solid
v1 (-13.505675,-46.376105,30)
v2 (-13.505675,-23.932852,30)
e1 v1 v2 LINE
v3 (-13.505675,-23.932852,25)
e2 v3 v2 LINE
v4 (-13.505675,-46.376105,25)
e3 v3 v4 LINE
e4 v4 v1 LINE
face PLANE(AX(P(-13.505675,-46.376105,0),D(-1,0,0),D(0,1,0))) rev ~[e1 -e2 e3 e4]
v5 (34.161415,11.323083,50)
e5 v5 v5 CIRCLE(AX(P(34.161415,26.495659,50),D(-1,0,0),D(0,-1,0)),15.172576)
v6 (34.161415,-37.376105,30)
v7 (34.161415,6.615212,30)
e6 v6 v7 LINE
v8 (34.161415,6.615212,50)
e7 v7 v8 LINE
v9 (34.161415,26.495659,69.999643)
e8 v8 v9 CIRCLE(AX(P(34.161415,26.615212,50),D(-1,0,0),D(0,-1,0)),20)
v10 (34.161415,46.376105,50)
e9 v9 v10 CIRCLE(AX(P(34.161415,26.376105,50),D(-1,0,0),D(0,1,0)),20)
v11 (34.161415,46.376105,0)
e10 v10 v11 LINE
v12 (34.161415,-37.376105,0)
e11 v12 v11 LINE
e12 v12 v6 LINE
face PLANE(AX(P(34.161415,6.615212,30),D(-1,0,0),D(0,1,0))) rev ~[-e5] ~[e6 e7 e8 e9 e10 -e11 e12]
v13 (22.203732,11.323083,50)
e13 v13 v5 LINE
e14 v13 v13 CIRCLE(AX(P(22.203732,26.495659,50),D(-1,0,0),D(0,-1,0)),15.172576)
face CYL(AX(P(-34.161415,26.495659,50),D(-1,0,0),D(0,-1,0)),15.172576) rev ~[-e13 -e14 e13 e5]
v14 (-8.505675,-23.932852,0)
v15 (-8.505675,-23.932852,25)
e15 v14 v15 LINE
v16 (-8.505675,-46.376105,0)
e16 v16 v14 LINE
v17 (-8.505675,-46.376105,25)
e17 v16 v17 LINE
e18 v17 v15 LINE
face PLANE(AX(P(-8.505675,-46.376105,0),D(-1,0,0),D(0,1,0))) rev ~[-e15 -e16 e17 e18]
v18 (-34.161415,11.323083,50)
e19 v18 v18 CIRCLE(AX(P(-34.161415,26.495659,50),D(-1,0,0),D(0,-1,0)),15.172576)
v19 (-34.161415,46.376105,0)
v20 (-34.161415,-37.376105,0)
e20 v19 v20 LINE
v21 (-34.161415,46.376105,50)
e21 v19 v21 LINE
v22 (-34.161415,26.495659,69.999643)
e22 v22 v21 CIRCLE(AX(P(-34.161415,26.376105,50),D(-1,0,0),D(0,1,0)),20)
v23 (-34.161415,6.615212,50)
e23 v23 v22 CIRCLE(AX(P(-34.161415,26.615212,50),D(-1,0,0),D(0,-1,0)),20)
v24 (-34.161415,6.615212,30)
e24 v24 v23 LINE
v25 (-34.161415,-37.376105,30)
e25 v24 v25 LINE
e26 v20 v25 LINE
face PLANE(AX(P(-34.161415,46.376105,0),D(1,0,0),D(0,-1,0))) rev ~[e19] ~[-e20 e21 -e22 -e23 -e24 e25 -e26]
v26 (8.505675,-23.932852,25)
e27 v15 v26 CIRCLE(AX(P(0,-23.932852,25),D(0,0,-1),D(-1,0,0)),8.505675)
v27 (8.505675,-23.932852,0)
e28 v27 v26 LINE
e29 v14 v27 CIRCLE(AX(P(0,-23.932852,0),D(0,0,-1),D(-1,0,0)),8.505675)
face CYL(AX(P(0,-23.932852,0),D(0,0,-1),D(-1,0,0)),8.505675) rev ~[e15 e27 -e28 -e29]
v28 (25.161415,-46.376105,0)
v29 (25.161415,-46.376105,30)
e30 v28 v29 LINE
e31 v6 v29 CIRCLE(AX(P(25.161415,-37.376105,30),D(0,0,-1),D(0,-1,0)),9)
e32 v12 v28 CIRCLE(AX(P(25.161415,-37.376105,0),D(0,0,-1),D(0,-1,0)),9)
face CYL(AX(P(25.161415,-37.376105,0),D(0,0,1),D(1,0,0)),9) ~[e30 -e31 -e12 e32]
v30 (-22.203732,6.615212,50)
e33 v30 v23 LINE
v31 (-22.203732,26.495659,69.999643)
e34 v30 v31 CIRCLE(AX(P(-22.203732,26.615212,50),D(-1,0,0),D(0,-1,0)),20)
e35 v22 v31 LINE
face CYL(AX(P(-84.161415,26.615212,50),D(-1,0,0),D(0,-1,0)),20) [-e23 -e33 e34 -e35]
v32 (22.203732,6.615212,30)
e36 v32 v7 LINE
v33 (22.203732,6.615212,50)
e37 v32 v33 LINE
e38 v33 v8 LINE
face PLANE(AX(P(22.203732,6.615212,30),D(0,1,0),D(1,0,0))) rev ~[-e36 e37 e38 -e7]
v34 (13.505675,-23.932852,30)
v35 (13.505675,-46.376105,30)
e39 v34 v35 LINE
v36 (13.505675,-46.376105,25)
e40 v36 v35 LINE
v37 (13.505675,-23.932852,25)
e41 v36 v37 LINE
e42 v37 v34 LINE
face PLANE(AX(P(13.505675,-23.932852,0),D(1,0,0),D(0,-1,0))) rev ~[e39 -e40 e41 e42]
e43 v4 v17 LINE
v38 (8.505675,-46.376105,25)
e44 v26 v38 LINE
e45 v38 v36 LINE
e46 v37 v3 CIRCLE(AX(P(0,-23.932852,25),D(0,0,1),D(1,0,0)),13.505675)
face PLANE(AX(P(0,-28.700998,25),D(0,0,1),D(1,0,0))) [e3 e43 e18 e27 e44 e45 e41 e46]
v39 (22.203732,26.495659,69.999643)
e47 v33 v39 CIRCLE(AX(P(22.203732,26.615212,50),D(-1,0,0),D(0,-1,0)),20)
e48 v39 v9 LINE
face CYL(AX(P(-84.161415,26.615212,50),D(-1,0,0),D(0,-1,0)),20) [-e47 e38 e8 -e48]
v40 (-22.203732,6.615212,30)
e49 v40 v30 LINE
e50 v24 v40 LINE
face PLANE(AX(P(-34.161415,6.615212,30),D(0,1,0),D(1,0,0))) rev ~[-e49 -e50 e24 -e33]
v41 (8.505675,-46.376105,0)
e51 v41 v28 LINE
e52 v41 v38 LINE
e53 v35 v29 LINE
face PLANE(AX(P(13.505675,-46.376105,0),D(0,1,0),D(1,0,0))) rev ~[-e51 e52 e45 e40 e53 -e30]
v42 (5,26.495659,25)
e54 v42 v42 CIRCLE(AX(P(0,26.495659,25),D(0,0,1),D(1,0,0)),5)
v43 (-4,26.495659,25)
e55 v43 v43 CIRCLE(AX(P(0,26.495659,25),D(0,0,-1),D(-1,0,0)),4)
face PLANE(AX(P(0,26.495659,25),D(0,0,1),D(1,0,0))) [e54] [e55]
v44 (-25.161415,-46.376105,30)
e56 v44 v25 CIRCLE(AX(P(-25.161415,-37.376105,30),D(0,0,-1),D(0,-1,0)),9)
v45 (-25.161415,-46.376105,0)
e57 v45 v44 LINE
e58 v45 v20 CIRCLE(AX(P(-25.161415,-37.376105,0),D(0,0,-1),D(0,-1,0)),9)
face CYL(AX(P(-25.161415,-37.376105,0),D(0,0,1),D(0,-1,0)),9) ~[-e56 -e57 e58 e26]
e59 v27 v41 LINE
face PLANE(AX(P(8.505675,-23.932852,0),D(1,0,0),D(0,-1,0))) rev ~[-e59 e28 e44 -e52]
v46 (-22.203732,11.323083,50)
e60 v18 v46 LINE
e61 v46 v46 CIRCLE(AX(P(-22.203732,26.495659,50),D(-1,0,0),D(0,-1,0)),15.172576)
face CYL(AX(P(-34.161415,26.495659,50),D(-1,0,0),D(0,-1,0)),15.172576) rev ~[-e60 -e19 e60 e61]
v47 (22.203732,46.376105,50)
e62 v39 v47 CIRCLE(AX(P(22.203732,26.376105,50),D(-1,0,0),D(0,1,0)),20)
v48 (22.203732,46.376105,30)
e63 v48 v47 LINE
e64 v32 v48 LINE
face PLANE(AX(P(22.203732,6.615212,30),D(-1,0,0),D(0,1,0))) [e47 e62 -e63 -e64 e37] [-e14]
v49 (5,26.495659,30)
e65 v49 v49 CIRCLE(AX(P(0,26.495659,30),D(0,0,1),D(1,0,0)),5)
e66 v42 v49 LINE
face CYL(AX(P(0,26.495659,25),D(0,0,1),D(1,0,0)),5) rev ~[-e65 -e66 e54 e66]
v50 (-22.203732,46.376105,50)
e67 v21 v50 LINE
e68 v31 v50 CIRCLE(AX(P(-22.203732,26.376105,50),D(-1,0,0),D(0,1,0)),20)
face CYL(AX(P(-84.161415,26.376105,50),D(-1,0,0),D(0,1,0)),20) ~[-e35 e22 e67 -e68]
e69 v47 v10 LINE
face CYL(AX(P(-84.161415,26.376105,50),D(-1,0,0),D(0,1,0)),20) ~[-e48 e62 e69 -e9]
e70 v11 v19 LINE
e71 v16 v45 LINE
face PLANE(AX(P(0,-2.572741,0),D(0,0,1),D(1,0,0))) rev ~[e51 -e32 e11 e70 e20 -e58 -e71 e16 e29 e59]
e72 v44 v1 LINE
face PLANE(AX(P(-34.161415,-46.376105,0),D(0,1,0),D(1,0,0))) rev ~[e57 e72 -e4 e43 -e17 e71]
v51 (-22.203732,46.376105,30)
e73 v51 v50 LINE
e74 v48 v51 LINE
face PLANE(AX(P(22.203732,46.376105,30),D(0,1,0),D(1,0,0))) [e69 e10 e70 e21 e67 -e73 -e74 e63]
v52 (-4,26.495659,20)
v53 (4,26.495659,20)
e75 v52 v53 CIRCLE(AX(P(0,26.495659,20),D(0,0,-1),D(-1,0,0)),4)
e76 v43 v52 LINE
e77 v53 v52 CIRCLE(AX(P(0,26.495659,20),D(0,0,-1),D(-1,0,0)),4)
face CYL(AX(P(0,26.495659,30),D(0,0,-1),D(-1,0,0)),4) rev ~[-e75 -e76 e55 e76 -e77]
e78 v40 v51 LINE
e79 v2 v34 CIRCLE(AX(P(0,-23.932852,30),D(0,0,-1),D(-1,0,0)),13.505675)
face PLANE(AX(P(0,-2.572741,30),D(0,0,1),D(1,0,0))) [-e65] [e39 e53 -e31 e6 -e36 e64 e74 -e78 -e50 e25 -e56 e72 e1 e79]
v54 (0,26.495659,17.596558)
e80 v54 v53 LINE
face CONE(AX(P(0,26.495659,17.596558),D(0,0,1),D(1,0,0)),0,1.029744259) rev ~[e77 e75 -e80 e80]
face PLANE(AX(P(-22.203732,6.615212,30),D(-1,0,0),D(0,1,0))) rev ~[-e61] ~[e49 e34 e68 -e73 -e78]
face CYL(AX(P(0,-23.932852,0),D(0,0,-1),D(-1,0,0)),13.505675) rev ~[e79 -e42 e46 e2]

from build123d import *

# Parameters (mm, degrees)
F1_DEPTH        = 25
F2_DEPTH        = 30
F3_W            = 11.9576826692
F3_H            = 39.7608936764
F4_DEPTH        = 40
F5_R            = 15.1725757167
F6_DEPTH        = 68.3238299022
F7_T1_DEPTH     = 111.9576826692
F7_T3_DEPTH     = 111.9576826692
F8_R            = 9
F10_D           = 8
F10_DEPTH       = 10
F10_CBORE_D     = 10
F10_CBORE_DEPTH = 5
F10_TIP         = 2.4034424761


# Not quite as in the source:
# - a fillet or chamfer that OpenCascade refuses, or shapes differently, is made with other operations: its cross-section is extruded or revolved along the edge and cut away or added


with BuildPart() as f1:
    # F0 (on Top) → F1 (new body)
    with BuildSketch(Plane.XY):
        with BuildLine():
            Line((8.5056748986, -46.3761053979), (13.5056748986, -46.3761053979))
            Line((13.5056748986, -46.3761053979), (13.5056748986, -23.932851851))
            ThreePointArc((13.5056748986, -23.932851851), (0, -10.4271769524), (-13.5056748986, -23.932851851))
            Line((-13.5056748986, -23.932851851), (-13.5056748986, -46.3761053979))
            Line((-13.5056748986, -46.3761053979), (-8.5056748986, -46.3761053979))
            Line((-8.5056748986, -46.3761053979), (-8.5056748986, -23.932851851))
            ThreePointArc((-8.5056748986, -23.932851851), (0, -15.4271769524), (8.5056748986, -23.932851851))
            Line((8.5056748986, -23.932851851), (8.5056748986, -46.3761053979))
        make_face()
    extrude(amount=F1_DEPTH)

    # F0 (on Top) → F2 (join)
    with BuildSketch(Plane.XY):
        with BuildLine():
            Line((34.1614149511, -46.3761053979), (34.1614149511, 46.3761053979))
            Line((34.1614149511, 46.3761053979), (-34.1614149511, 46.3761053979))
            Line((-34.1614149511, 46.3761053979), (-34.1614149511, -46.3761053979))
            Line((-34.1614149511, -46.3761053979), (-13.5056748986, -46.3761053979))
            Line((-13.5056748986, -46.3761053979), (-13.5056748986, -23.932851851))
            ThreePointArc((-13.5056748986, -23.932851851), (0, -10.4271769524), (13.5056748986, -23.932851851))
            Line((13.5056748986, -23.932851851), (13.5056748986, -46.3761053979))
            Line((13.5056748986, -46.3761053979), (34.1614149511, -46.3761053979))
        make_face()
    extrude(amount=F2_DEPTH)

    # F3 (on face) → F4 (join)
    with BuildSketch(Plane.XY.offset(30)):
        with Locations((28.1825736165, 26.4956585597)):
            Rectangle(F3_W, F3_H)
        with Locations((-28.1825736165, 26.4956585597)):
            Rectangle(F3_W, F3_H)
    extrude(amount=F4_DEPTH)

    # F5 (on face) → F6 (cut, through all)
    with BuildSketch(Plane(origin=(-34.1614149511, 0, 0), x_dir=(0, -1, 0), z_dir=(-1, 0, 0))):
        with Locations((-26.4956585597, 50)):
            Circle(F5_R)
    extrude(amount=-F6_DEPTH, mode=Mode.SUBTRACT)

    # F7: fillet of radius 20 on 4 edges, made by hand

    # F7_s2 → F7_t1 (cut)
    with BuildSketch(Plane.YZ.offset(-84.1614149511)):
        with BuildLine():
            ThreePointArc((6.6152117215, 50), (12.4730760978, 64.1421356237), (26.6152117215, 70))
            Line((26.6152117215, 70), (6.6152117215, 70))
            Line((6.6152117215, 70), (6.6152117215, 50))
        make_face()
        with BuildLine():
            ThreePointArc((46.3761053979, 50), (40.5182410217, 64.1421356237), (26.3761053979, 70))
            Line((26.3761053979, 70), (46.3761053979, 70))
            Line((46.3761053979, 70), (46.3761053979, 50))
        make_face()
    extrude(amount=F7_T1_DEPTH, mode=Mode.SUBTRACT)

    # F7_s4 → F7_t3 (cut)
    with BuildSketch(Plane.YZ.offset(-27.7962677181)):
        with BuildLine():
            ThreePointArc((6.6152117215, 50), (12.4730760978, 64.1421356237), (26.6152117215, 70))
            Line((26.6152117215, 70), (6.6152117215, 70))
            Line((6.6152117215, 70), (6.6152117215, 50))
        make_face()
        with BuildLine():
            ThreePointArc((46.3761053979, 50), (40.5182410217, 64.1421356237), (26.3761053979, 70))
            Line((26.3761053979, 70), (46.3761053979, 70))
            Line((46.3761053979, 70), (46.3761053979, 50))
        make_face()
    extrude(amount=F7_T3_DEPTH, mode=Mode.SUBTRACT)

    # F8
    f8_edges = [f1.edges().sort_by_distance(p)[0] for p in [
        (34.161415, -46.376105, 15),
        (-34.161415, -46.376105, 15),
    ]]
    fillet(f8_edges, radius=F8_R)

    # F10
    with Locations(Plane.XY.offset(30)):
        with Locations((0, 26.4956585597)):
            CounterBoreHole(F10_D / 2, F10_CBORE_D / 2, F10_CBORE_DEPTH, depth=F10_DEPTH)
            with Locations((0, 0, -(F10_DEPTH + F10_TIP / 2))):  # 118° drill point
                Cone(0, F10_D / 2, F10_TIP, mode=Mode.SUBTRACT)


solid = f1.part
